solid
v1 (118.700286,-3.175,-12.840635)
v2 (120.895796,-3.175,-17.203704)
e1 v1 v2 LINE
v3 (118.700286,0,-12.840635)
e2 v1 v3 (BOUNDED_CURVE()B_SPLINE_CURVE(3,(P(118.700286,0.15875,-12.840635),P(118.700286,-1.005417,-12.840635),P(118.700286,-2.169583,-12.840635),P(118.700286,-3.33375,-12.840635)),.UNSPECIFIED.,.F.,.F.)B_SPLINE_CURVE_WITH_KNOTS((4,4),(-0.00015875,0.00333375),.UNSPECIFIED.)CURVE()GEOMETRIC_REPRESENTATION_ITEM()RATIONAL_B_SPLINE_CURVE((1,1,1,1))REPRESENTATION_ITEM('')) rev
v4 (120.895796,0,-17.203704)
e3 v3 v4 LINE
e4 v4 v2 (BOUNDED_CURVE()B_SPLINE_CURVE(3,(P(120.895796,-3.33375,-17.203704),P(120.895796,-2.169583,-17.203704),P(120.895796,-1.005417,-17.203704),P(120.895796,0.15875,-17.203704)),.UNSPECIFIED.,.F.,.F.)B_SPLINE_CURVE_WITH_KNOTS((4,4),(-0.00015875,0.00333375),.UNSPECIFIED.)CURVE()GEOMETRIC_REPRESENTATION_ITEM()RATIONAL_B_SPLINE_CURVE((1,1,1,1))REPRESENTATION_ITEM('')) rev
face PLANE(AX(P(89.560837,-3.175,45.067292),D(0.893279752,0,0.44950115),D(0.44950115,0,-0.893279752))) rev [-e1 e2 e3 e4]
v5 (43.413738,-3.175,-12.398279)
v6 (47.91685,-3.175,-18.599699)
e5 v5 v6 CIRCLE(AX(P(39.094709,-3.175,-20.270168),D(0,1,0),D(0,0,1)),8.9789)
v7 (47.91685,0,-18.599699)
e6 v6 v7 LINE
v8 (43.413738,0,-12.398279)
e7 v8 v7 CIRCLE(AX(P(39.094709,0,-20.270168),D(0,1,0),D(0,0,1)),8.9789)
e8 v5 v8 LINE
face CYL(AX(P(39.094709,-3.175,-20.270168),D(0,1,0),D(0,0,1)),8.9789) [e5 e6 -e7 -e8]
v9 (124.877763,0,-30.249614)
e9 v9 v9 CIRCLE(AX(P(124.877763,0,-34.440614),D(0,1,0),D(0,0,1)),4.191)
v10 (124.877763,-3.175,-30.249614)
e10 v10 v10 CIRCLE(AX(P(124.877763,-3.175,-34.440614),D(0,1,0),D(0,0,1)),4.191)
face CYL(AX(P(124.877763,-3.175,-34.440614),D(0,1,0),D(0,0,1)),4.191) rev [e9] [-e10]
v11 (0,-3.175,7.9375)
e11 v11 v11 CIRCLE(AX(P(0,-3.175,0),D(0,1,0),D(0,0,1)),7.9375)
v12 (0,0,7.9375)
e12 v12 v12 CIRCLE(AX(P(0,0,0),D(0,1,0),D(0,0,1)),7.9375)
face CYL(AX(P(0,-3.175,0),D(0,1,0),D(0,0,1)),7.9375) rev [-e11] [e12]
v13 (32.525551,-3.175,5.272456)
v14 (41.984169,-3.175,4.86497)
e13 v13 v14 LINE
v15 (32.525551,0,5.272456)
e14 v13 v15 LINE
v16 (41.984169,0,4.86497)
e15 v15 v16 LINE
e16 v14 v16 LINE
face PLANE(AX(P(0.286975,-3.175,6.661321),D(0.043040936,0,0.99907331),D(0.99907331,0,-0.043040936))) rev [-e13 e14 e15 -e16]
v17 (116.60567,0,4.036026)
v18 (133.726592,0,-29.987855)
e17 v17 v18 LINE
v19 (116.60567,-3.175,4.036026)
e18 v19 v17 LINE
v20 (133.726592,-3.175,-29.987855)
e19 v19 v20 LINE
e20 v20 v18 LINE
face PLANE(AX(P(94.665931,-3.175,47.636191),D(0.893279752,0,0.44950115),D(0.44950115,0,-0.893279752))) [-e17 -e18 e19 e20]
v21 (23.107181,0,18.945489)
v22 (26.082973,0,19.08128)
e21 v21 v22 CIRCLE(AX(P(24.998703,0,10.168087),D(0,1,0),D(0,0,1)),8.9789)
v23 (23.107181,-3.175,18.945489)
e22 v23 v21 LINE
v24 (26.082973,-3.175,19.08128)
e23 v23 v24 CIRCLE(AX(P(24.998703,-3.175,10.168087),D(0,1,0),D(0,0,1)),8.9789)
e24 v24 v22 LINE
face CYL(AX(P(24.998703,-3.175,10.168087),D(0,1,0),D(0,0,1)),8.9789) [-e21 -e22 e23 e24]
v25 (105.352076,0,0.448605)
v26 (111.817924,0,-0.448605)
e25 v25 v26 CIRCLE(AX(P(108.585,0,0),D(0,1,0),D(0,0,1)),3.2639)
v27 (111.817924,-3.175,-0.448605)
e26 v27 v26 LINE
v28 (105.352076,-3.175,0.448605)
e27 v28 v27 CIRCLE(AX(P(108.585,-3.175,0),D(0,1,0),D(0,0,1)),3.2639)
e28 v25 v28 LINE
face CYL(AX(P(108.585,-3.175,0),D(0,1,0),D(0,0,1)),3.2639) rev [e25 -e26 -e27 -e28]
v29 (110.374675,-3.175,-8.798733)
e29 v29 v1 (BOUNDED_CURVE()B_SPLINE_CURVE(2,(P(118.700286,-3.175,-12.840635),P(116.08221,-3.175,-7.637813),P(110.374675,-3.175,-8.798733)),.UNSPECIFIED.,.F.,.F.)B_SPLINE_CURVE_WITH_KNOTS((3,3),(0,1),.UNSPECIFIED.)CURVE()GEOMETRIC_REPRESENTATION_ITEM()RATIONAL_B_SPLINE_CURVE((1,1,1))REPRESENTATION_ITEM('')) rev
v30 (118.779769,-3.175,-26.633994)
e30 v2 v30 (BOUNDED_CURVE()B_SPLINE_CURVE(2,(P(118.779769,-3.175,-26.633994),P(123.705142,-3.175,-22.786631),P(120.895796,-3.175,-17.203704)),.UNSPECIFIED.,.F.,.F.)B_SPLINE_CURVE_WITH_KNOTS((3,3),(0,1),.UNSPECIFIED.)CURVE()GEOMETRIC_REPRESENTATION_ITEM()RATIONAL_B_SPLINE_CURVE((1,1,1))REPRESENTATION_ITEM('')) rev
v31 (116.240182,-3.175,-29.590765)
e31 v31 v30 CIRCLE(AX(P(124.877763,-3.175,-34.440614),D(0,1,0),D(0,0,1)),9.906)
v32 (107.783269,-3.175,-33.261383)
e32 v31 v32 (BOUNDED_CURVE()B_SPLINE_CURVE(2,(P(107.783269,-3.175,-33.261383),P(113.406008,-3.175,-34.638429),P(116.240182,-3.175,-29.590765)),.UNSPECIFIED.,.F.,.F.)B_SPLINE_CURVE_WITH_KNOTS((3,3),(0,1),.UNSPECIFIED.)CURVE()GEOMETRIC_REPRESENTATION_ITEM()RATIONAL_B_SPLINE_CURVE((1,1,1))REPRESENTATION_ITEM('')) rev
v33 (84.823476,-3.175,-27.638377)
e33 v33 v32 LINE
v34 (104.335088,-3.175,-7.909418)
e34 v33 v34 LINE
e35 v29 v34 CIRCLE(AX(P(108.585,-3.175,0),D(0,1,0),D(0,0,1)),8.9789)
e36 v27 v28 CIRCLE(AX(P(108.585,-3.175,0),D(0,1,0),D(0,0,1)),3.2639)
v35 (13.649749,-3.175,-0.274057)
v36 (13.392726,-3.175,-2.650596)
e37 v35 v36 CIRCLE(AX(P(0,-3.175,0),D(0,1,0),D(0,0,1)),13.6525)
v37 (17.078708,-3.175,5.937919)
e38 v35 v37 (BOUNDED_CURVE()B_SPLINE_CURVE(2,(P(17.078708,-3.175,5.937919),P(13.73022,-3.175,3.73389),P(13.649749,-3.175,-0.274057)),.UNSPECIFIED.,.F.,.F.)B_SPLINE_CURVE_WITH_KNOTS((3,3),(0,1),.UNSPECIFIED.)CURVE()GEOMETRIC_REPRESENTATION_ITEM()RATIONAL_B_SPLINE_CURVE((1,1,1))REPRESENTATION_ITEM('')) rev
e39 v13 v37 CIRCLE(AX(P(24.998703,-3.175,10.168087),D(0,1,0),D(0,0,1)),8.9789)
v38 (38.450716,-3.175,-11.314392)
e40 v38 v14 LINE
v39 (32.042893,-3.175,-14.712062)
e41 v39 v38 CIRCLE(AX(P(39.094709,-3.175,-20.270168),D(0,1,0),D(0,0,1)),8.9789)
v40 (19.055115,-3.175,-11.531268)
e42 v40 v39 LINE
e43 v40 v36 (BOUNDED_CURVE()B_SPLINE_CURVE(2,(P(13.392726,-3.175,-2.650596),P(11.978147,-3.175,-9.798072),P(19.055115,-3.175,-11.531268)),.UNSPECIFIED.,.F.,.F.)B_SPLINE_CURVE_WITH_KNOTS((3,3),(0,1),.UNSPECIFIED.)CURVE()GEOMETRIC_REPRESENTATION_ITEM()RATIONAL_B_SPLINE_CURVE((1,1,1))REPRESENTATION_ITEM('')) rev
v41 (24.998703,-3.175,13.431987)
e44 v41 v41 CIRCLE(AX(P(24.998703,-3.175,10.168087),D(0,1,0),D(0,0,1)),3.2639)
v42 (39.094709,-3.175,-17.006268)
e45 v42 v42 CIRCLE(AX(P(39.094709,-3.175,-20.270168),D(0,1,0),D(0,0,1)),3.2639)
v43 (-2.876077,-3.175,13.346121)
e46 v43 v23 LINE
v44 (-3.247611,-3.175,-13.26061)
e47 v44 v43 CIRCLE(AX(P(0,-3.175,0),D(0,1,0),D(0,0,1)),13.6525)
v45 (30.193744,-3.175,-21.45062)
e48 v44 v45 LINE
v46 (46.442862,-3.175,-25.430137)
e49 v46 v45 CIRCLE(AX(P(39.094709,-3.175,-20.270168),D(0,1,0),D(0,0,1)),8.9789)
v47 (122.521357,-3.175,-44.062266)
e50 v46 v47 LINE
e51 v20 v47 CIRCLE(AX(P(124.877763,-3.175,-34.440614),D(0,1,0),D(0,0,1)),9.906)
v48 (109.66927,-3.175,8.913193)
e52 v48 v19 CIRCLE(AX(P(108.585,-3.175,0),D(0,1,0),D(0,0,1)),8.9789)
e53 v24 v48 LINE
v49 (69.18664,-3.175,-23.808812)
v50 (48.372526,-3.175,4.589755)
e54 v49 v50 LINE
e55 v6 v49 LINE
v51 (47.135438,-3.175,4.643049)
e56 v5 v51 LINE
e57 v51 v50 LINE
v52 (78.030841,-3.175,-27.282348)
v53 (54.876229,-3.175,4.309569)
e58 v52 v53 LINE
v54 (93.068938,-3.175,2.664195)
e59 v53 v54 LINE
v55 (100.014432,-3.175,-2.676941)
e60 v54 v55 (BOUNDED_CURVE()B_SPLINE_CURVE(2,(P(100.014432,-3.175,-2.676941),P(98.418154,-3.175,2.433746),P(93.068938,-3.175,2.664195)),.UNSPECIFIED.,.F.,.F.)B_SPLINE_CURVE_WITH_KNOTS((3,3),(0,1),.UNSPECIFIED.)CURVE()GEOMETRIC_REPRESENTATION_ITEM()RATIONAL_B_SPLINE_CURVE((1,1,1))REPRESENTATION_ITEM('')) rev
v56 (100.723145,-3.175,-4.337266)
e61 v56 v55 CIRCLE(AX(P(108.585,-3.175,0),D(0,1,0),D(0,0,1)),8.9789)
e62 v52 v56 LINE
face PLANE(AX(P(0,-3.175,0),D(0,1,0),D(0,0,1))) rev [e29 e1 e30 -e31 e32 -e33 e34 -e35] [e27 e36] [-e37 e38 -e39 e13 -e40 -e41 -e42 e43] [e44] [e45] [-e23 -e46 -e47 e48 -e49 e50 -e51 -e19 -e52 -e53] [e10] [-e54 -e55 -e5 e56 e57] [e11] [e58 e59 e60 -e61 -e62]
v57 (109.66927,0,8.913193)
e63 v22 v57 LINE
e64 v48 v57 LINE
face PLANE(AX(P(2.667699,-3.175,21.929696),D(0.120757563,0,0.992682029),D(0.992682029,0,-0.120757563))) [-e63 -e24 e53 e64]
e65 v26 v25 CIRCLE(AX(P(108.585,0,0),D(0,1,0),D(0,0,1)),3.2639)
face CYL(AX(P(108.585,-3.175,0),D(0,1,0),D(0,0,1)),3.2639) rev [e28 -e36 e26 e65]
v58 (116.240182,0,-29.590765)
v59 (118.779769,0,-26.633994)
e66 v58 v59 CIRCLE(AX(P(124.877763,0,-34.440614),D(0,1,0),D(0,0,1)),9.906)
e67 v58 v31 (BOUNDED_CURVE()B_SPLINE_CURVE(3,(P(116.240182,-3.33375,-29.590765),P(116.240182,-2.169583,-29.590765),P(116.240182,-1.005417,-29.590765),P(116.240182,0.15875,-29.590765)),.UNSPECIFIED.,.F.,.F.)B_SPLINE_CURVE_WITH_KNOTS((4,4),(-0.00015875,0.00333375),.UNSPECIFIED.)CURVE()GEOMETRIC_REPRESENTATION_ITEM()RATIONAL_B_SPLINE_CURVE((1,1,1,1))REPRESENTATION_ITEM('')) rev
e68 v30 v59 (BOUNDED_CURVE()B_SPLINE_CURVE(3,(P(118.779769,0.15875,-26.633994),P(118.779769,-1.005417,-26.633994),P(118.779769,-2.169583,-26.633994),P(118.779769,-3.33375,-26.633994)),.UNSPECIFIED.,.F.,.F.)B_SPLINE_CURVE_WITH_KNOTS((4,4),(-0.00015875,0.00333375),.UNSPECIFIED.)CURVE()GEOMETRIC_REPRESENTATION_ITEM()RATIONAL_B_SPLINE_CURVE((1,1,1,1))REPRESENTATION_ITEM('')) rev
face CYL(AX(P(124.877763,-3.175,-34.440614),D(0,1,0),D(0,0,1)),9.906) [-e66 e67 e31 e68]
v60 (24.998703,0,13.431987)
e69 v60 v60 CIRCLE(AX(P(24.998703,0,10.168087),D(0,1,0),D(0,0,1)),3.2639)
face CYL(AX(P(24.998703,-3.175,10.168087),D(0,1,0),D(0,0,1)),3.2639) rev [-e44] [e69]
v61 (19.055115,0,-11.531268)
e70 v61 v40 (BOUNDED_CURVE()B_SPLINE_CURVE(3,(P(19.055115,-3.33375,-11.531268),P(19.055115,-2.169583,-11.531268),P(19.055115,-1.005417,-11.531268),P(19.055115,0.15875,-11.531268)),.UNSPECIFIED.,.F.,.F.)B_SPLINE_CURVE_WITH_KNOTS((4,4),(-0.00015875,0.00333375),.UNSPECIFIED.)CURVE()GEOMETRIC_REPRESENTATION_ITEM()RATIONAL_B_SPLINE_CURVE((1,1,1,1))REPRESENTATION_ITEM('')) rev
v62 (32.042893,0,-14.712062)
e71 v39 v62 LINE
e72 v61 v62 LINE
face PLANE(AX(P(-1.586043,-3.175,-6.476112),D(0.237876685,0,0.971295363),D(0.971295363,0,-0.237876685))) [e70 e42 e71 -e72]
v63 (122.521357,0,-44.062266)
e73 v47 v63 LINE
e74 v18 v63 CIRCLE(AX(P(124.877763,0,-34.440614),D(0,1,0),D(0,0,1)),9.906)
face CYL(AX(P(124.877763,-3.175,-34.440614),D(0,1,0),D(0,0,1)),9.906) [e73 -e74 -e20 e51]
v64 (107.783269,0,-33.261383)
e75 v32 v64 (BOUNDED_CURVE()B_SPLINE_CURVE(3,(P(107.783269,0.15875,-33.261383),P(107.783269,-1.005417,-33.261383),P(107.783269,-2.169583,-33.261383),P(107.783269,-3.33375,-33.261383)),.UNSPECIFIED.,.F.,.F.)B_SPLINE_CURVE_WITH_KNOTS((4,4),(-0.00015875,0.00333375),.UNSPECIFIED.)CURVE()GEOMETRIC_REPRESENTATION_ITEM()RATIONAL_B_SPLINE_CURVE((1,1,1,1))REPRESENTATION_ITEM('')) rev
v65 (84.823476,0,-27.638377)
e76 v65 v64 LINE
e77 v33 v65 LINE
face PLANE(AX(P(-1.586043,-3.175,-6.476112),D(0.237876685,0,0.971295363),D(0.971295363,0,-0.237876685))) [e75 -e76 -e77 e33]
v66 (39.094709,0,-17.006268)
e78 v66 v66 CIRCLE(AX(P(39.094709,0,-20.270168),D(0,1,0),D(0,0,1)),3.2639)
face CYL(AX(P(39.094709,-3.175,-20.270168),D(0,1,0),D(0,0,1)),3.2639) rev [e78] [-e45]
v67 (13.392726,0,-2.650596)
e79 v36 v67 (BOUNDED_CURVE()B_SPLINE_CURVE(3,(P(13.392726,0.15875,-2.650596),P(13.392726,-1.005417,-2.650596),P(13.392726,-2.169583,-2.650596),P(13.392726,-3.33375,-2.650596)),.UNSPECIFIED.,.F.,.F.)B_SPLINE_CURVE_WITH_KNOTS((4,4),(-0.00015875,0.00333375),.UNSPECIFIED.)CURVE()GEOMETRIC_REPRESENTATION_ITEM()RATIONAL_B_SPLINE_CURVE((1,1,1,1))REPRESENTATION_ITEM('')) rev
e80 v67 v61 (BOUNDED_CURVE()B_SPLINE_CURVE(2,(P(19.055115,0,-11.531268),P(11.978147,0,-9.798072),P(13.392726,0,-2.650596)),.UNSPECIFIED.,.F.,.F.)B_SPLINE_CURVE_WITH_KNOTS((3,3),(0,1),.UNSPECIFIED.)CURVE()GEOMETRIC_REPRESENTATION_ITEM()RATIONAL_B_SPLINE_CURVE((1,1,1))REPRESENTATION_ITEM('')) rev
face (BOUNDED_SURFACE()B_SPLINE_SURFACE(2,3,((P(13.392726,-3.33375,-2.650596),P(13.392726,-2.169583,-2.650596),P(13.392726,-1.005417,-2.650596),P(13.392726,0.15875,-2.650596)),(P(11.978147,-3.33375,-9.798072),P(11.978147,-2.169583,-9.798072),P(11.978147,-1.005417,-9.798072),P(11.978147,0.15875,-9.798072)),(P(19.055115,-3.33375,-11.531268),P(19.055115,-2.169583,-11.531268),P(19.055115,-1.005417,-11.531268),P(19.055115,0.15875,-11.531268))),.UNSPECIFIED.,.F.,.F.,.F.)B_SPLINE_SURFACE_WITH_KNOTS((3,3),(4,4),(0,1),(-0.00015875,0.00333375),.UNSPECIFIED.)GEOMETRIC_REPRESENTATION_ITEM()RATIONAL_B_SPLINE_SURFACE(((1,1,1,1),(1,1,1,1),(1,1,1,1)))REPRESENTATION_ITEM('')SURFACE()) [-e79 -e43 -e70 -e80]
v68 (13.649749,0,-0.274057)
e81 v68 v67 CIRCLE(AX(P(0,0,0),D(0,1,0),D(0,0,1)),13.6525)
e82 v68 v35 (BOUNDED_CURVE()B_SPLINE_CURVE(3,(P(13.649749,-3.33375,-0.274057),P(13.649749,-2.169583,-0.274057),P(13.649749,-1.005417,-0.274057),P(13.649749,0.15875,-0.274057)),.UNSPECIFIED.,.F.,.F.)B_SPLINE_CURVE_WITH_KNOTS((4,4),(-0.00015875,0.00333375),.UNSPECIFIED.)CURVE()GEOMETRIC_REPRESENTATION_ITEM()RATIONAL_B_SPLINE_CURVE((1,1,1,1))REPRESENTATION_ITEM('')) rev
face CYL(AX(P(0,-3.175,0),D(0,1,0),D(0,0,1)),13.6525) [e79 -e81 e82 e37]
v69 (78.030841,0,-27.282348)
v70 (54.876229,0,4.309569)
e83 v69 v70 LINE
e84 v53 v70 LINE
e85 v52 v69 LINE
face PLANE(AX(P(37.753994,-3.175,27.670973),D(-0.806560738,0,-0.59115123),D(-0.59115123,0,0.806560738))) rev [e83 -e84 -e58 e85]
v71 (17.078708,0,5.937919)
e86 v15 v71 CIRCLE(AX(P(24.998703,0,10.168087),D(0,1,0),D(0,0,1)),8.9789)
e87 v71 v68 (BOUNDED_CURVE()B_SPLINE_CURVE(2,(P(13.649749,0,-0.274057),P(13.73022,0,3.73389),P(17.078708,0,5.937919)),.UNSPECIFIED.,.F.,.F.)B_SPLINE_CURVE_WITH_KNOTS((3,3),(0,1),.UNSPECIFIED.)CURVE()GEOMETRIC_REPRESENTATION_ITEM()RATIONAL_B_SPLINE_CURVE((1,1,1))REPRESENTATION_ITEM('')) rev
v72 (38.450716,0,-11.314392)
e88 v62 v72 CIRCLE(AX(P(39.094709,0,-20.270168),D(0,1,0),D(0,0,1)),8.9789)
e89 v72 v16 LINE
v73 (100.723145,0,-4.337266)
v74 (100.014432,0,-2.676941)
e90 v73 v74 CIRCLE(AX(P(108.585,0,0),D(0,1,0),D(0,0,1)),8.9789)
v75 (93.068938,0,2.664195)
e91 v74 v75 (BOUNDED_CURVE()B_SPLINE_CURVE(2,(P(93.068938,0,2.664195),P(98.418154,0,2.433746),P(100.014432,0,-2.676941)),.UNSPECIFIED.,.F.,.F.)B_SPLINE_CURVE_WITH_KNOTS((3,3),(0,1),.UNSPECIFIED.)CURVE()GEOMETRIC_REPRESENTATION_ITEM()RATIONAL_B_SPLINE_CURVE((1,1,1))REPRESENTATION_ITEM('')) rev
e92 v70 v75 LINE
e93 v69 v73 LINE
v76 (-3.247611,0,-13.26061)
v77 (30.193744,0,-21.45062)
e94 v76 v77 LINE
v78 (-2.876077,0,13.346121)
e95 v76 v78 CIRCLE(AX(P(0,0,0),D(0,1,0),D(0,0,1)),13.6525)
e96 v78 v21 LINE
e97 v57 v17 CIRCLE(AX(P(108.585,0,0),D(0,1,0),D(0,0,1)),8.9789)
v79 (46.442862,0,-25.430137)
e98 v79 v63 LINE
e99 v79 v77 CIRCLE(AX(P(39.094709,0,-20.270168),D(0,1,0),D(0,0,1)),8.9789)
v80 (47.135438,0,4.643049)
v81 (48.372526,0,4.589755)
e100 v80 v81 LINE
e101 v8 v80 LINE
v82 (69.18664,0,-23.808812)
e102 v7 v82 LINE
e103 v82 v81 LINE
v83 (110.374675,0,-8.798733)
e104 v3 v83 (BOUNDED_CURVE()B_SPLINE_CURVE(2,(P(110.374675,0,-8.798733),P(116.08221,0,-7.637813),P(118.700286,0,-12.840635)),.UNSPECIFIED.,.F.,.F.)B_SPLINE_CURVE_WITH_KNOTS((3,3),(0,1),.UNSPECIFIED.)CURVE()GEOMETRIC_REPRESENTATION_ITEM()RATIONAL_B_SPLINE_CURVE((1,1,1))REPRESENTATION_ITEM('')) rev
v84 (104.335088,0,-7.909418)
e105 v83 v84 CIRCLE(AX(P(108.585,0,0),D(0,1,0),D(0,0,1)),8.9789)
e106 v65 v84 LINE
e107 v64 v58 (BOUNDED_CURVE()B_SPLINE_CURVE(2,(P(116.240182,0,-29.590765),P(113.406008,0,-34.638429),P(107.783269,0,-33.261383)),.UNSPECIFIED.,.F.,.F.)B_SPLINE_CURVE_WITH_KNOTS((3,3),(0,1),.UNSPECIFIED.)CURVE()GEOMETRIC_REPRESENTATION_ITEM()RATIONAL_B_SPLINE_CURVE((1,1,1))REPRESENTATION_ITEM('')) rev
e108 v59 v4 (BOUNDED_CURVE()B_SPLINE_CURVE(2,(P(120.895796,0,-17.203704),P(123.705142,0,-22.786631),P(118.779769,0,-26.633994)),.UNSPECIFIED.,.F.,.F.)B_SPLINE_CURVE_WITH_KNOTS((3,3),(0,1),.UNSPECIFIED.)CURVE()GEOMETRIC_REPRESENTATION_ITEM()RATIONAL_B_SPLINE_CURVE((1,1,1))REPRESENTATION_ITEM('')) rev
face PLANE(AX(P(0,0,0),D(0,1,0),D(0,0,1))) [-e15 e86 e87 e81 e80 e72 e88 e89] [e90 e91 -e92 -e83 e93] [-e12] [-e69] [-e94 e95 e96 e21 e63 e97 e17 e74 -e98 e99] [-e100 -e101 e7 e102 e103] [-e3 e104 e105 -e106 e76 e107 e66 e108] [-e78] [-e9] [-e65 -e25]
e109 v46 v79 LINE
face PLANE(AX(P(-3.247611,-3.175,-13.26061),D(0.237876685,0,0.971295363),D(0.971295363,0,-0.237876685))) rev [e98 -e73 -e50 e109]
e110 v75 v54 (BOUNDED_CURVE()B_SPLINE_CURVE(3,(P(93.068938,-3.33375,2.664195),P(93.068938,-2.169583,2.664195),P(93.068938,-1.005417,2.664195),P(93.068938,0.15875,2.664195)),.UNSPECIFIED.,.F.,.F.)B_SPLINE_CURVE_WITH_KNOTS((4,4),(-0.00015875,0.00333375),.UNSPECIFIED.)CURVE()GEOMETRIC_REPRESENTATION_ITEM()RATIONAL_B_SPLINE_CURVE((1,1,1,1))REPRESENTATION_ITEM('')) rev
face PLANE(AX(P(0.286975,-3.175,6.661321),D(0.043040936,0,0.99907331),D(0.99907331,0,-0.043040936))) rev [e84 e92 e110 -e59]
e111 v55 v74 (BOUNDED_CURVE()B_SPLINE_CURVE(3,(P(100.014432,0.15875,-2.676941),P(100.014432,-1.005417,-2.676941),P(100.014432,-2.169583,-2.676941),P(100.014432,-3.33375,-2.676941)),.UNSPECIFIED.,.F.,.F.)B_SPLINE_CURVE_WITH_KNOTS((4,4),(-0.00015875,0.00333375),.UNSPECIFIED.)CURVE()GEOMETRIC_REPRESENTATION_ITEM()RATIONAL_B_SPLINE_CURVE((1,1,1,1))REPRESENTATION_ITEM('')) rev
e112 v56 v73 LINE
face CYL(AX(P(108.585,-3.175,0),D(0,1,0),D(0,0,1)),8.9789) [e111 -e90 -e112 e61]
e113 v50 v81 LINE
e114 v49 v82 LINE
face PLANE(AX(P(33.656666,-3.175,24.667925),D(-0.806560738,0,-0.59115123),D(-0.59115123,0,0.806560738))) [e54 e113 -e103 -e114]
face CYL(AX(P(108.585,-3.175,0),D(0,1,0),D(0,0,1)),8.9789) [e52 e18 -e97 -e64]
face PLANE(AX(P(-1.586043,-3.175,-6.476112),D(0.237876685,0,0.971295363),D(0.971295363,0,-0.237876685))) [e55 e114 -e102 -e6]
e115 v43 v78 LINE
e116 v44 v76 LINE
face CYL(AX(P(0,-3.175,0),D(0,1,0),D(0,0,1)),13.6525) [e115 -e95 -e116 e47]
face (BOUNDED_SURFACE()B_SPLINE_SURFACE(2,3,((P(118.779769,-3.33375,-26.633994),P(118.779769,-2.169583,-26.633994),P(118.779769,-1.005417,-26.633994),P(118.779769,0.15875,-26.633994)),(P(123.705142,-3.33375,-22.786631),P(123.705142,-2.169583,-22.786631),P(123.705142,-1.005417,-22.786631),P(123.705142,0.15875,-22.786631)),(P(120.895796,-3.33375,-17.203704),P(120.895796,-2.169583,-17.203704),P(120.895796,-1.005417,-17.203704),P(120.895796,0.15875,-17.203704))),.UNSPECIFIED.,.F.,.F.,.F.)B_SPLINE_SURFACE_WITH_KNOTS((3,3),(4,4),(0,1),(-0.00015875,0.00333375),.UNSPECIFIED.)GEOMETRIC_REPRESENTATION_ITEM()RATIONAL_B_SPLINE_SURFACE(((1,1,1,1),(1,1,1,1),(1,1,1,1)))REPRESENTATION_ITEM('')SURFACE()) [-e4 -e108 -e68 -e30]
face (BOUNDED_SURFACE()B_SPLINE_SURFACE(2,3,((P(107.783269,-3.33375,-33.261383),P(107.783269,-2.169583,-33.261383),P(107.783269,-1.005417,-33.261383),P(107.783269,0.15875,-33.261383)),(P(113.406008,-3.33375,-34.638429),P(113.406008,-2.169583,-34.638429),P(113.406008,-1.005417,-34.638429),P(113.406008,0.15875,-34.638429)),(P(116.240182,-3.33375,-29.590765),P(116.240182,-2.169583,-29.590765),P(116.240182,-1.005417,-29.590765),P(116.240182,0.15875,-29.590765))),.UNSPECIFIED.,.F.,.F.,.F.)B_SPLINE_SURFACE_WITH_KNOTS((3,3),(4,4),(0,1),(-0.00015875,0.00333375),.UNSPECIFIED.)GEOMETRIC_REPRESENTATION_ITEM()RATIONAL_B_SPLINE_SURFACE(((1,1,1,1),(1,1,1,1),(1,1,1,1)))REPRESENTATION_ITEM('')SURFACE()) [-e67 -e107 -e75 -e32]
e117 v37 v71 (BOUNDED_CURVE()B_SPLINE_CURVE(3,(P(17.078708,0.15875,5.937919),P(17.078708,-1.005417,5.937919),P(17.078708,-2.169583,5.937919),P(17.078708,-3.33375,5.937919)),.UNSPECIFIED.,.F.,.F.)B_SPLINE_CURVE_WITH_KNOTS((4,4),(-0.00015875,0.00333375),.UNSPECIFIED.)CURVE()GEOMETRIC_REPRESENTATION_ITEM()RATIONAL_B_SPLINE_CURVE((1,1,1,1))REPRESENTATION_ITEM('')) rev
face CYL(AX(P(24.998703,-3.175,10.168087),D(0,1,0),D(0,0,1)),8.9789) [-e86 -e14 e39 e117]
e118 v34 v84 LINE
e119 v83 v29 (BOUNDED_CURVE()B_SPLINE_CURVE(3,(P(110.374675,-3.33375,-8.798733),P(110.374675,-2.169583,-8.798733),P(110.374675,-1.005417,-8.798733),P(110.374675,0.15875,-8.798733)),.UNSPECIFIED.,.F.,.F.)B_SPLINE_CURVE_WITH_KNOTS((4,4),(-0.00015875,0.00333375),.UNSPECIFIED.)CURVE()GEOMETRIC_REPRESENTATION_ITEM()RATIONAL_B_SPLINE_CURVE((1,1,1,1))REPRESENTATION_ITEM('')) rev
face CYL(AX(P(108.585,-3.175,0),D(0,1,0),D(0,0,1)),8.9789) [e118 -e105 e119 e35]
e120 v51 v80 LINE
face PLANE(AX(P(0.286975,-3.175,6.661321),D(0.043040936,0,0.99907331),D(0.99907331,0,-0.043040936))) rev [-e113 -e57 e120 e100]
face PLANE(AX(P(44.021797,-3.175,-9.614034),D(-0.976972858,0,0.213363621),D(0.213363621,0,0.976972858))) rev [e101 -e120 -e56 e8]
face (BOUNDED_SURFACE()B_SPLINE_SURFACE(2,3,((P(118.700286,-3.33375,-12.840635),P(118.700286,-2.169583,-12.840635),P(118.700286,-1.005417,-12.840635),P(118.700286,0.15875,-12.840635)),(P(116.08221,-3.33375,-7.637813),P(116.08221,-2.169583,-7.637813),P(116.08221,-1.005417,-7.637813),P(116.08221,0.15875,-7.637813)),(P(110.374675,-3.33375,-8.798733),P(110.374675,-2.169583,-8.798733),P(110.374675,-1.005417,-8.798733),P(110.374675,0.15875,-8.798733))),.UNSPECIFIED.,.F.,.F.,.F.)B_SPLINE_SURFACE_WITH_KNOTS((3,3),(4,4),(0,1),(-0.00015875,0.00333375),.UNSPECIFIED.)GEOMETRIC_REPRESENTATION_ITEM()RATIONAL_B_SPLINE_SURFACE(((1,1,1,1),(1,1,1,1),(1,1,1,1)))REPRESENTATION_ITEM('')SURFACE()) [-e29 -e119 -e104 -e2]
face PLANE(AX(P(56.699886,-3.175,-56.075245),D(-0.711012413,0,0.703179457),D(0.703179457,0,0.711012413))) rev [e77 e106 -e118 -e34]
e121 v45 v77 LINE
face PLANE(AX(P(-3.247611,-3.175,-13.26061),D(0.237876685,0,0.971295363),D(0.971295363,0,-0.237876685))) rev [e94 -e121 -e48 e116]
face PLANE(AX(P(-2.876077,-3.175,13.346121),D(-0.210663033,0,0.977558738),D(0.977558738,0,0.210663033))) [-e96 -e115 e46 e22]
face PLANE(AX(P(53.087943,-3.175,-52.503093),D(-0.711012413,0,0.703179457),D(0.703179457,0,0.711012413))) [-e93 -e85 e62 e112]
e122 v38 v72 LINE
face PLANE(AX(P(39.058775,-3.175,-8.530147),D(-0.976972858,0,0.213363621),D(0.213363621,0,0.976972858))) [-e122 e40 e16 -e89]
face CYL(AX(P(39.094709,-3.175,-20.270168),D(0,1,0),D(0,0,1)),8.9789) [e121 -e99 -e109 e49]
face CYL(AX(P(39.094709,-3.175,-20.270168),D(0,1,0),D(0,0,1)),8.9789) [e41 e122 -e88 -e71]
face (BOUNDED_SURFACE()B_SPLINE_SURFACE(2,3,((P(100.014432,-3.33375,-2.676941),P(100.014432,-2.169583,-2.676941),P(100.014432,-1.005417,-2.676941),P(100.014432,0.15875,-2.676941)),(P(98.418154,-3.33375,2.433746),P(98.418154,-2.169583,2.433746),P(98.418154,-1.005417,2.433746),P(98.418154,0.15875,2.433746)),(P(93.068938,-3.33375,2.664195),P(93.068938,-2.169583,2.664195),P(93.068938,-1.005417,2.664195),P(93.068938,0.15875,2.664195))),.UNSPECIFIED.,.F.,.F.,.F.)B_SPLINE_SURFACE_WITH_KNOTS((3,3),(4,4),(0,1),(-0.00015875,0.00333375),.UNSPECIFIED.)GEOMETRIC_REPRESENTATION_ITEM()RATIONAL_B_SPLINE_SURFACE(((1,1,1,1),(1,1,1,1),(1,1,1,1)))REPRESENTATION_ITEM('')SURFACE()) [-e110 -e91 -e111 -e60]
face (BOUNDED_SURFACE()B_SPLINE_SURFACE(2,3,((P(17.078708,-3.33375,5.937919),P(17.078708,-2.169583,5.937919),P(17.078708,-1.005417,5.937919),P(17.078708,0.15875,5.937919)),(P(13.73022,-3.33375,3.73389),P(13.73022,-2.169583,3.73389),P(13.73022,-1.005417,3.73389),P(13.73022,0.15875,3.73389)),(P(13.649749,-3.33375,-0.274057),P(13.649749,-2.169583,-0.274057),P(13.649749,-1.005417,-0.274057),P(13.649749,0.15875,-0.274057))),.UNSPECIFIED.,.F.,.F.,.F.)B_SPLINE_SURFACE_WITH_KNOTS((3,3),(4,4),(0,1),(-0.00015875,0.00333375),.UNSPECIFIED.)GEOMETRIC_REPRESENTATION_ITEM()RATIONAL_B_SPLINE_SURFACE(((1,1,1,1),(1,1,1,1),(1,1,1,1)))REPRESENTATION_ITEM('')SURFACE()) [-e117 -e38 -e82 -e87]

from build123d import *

# Parameters (mm, degrees)
SKETCH1_R           = 3.2639
SKETCH1_R_2         = 7.9375
SKETCH1_R_3         = 4.191
BOSS_EXTRUDE4_DEPTH = 3.175
FILLET1_START       = -3.175
FILLET1_DEPTH       = 3.175


with BuildPart() as part:
    # Sketch1 → Boss-Extrude4 (new body)
    with BuildSketch(Plane(origin=(0, 0, 0), x_dir=(1, 0, 0), z_dir=(0, 1, 0))):
        with BuildLine():
            ThreePointArc((133.726592386, 29.98785526), (132.627611185, 40.61059676), (122.521356715, 44.06226552))
            Line((122.521356715, 44.06226552), (46.442862481, 25.430137021))
            ThreePointArc((46.442862481, 25.430137021), (36.958837973, 28.991331503), (30.193743977, 21.450619984))
            Line((30.193743977, 21.450619984), (-3.247611444, 13.260609947))
            ThreePointArc((-3.247611444, 13.260609947), (-13.651169136, -0.190623903), (-2.876077052, -13.346120674))
            Line((-2.876077052, -13.346120674), (23.107180797, -18.945489468))
            ThreePointArc((23.107180797, -18.945489468), (24.589406384, -19.137653713), (26.082973185, -19.081279984))
            Line((26.082973185, -19.081279984), (109.669270086, -8.913192671))
            ThreePointArc((109.669270086, -8.913192671), (113.749462268, -7.344996575), (116.60566957, -4.036025875))
            Line((116.60566957, -4.036025875), (133.726592386, 29.98785526))
        make_face()
        with Locations(Location((24.998703099, -10.168087313, 0), (0, 0, 270))):
            Circle(SKETCH1_R, mode=Mode.SUBTRACT)
        with Locations(Location((0, 0, 0), (0, 0, 270))):
            Circle(SKETCH1_R_2, mode=Mode.SUBTRACT)
        with BuildLine():
            Line((38.450716367, 11.314391845), (41.984168993, -4.864970405))
            Line((41.984168993, -4.864970405), (32.525550861, -5.272455792))
            ThreePointArc((32.525550861, -5.272455792), (24.612242842, -1.197507974), (17.07870805, -5.937919038))
            Line((17.07870805, -5.937919038), (12.189591197, -6.148546389))
            ThreePointArc((12.189591197, -6.148546389), (13.515826194, 1.926966151), (9.985636063, 9.310092839))
            Line((9.985636063, 9.310092839), (32.042893317, 14.712061629))
            ThreePointArc((32.042893317, 14.712061629), (34.888474765, 12.337435423), (38.450716367, 11.314391845))
        make_face(mode=Mode.SUBTRACT)
        with Locations(Location((39.094708942, 20.270167566, 0), (0, 0, 270))):
            Circle(SKETCH1_R, mode=Mode.SUBTRACT)
        with BuildLine():
            Line((54.876229285, -4.309569382), (78.030840873, 27.282347644))
            Line((78.030840873, 27.282347644), (100.723144875, 4.337266328))
            ThreePointArc((100.723144875, 4.337266328), (99.66914772, 1.062178575), (99.924218758, -2.368863331))
            Line((99.924218758, -2.368863331), (54.876229285, -4.309569382))
        make_face(mode=Mode.SUBTRACT)
        with BuildLine():
            Line((104.335087932, 7.90941797), (84.823475635, 27.638376771))
            Line((84.823475635, 27.638376771), (114.98908268, 35.026134276))
            ThreePointArc((114.98908268, 35.026134276), (117.570132445, 27.752761279), (124.58688197, 24.538885311))
            Line((124.58688197, 24.538885311), (115.260501822, 6.004858086))
            ThreePointArc((115.260501822, 6.004858086), (110.126982004, 8.845503757), (104.335087932, 7.90941797))
        make_face(mode=Mode.SUBTRACT)
        with Locations(Location((108.585, 0, 0), (0, 0, 270))):
            Circle(SKETCH1_R, mode=Mode.SUBTRACT)
        with BuildLine():
            Line((47.13543811, -4.64304931), (43.413738486, 12.398279038))
            ThreePointArc((43.413738486, 12.398279038), (46.36017499, 14.994407118), (47.916850432, 18.599699151))
            Line((47.916850432, 18.599699151), (69.18664036, 23.808811963))
            Line((69.18664036, 23.808811963), (48.372525925, -4.589754505))
            Line((48.372525925, -4.589754505), (47.13543811, -4.64304931))
        make_face(mode=Mode.SUBTRACT)
        with Locations(Location((124.877763158, 34.440613651, 0), (0, 0, 270))):
            Circle(SKETCH1_R_3, mode=Mode.SUBTRACT)
    extrude(amount=-BOSS_EXTRUDE4_DEPTH)

    # Fillet1: read off the stored shape, not the designer's step
    # Fillet1 outline → Fillet1 (add)
    with BuildSketch(Plane(origin=(0, 0, 0), x_dir=(1, 0, 0), z_dir=(0, 1, 0)).offset(FILLET1_START)):
        with BuildLine():
            Line((114.98908268, 35.026134276), (107.783269008, 33.261382651))
            add(Edge.make_bspline(
                [(107.783269008, 33.261382651), (113.406008329, 34.638428853), (116.240182309, 29.590764883)],
                knots=[0, 0, 0, 1, 1, 1], degree=2))
            ThreePointArc((116.240182309, 29.590764883), (115.224193881, 32.218579403), (114.98908268, 35.026134276))
        make_face()
        with BuildLine():
            Line((115.260501822, 6.004858086), (118.700286007, 12.840634961))
            add(Edge.make_bspline(
                [(118.700286007, 12.840634961), (116.082209563, 7.637812501), (110.374675184, 8.798733315)],
                knots=[0, 0, 0, 1, 1, 1], degree=2))
            ThreePointArc((110.374675184, 8.798733315), (113.042156059, 7.794511215), (115.260501822, 6.004858086))
        make_face()
        with BuildLine():
            ThreePointArc((124.58688197, 24.538885311), (121.515947768, 25.122511201), (118.779768978, 26.633994475))
            add(Edge.make_bspline(
                [(118.779768978, 26.633994475), (123.70514236, 22.786631417), (120.895795937, 17.203704037)],
                knots=[0, 0, 0, 1, 1, 1], degree=2))
            Line((120.895795937, 17.203704037), (124.58688197, 24.538885311))
        make_face()
        with BuildLine():
            ThreePointArc((9.985636063, 9.310092839), (12.154183418, 6.21824587), (13.392725611, 2.650595587))
            add(Edge.make_bspline(
                [(13.392725611, 2.650595587), (11.978146555, 9.798071891), (19.055114913, 11.531268442)],
                knots=[0, 0, 0, 1, 1, 1], degree=2))
            Line((19.055114913, 11.531268442), (9.985636063, 9.310092839))
        make_face()
        with BuildLine():
            add(Edge.make_bspline(
                [(17.07870805, -5.937919038), (13.730219916, -3.733889963), (13.649749039, 0.274057316)],
                knots=[0, 0, 0, 1, 1, 1], degree=2))
            ThreePointArc((13.649749039, 0.274057316), (13.312788421, -3.026618691), (12.189591197, -6.148546389))
            Line((12.189591197, -6.148546389), (17.07870805, -5.937919038))
        make_face()
        with BuildLine():
            ThreePointArc((99.924218758, -2.368863331), (99.607534733, 0.160507278), (100.014432232, 2.67694104))
            add(Edge.make_bspline(
                [(100.014432232, 2.67694104), (98.418154374, -2.433745878), (93.068937879, -2.664194715)],
                knots=[0, 0, 0, 1, 1, 1], degree=2))
            Line((93.068937879, -2.664194715), (99.924218758, -2.368863331))
        make_face()
    extrude(amount=FILLET1_DEPTH)


solid = part.part
